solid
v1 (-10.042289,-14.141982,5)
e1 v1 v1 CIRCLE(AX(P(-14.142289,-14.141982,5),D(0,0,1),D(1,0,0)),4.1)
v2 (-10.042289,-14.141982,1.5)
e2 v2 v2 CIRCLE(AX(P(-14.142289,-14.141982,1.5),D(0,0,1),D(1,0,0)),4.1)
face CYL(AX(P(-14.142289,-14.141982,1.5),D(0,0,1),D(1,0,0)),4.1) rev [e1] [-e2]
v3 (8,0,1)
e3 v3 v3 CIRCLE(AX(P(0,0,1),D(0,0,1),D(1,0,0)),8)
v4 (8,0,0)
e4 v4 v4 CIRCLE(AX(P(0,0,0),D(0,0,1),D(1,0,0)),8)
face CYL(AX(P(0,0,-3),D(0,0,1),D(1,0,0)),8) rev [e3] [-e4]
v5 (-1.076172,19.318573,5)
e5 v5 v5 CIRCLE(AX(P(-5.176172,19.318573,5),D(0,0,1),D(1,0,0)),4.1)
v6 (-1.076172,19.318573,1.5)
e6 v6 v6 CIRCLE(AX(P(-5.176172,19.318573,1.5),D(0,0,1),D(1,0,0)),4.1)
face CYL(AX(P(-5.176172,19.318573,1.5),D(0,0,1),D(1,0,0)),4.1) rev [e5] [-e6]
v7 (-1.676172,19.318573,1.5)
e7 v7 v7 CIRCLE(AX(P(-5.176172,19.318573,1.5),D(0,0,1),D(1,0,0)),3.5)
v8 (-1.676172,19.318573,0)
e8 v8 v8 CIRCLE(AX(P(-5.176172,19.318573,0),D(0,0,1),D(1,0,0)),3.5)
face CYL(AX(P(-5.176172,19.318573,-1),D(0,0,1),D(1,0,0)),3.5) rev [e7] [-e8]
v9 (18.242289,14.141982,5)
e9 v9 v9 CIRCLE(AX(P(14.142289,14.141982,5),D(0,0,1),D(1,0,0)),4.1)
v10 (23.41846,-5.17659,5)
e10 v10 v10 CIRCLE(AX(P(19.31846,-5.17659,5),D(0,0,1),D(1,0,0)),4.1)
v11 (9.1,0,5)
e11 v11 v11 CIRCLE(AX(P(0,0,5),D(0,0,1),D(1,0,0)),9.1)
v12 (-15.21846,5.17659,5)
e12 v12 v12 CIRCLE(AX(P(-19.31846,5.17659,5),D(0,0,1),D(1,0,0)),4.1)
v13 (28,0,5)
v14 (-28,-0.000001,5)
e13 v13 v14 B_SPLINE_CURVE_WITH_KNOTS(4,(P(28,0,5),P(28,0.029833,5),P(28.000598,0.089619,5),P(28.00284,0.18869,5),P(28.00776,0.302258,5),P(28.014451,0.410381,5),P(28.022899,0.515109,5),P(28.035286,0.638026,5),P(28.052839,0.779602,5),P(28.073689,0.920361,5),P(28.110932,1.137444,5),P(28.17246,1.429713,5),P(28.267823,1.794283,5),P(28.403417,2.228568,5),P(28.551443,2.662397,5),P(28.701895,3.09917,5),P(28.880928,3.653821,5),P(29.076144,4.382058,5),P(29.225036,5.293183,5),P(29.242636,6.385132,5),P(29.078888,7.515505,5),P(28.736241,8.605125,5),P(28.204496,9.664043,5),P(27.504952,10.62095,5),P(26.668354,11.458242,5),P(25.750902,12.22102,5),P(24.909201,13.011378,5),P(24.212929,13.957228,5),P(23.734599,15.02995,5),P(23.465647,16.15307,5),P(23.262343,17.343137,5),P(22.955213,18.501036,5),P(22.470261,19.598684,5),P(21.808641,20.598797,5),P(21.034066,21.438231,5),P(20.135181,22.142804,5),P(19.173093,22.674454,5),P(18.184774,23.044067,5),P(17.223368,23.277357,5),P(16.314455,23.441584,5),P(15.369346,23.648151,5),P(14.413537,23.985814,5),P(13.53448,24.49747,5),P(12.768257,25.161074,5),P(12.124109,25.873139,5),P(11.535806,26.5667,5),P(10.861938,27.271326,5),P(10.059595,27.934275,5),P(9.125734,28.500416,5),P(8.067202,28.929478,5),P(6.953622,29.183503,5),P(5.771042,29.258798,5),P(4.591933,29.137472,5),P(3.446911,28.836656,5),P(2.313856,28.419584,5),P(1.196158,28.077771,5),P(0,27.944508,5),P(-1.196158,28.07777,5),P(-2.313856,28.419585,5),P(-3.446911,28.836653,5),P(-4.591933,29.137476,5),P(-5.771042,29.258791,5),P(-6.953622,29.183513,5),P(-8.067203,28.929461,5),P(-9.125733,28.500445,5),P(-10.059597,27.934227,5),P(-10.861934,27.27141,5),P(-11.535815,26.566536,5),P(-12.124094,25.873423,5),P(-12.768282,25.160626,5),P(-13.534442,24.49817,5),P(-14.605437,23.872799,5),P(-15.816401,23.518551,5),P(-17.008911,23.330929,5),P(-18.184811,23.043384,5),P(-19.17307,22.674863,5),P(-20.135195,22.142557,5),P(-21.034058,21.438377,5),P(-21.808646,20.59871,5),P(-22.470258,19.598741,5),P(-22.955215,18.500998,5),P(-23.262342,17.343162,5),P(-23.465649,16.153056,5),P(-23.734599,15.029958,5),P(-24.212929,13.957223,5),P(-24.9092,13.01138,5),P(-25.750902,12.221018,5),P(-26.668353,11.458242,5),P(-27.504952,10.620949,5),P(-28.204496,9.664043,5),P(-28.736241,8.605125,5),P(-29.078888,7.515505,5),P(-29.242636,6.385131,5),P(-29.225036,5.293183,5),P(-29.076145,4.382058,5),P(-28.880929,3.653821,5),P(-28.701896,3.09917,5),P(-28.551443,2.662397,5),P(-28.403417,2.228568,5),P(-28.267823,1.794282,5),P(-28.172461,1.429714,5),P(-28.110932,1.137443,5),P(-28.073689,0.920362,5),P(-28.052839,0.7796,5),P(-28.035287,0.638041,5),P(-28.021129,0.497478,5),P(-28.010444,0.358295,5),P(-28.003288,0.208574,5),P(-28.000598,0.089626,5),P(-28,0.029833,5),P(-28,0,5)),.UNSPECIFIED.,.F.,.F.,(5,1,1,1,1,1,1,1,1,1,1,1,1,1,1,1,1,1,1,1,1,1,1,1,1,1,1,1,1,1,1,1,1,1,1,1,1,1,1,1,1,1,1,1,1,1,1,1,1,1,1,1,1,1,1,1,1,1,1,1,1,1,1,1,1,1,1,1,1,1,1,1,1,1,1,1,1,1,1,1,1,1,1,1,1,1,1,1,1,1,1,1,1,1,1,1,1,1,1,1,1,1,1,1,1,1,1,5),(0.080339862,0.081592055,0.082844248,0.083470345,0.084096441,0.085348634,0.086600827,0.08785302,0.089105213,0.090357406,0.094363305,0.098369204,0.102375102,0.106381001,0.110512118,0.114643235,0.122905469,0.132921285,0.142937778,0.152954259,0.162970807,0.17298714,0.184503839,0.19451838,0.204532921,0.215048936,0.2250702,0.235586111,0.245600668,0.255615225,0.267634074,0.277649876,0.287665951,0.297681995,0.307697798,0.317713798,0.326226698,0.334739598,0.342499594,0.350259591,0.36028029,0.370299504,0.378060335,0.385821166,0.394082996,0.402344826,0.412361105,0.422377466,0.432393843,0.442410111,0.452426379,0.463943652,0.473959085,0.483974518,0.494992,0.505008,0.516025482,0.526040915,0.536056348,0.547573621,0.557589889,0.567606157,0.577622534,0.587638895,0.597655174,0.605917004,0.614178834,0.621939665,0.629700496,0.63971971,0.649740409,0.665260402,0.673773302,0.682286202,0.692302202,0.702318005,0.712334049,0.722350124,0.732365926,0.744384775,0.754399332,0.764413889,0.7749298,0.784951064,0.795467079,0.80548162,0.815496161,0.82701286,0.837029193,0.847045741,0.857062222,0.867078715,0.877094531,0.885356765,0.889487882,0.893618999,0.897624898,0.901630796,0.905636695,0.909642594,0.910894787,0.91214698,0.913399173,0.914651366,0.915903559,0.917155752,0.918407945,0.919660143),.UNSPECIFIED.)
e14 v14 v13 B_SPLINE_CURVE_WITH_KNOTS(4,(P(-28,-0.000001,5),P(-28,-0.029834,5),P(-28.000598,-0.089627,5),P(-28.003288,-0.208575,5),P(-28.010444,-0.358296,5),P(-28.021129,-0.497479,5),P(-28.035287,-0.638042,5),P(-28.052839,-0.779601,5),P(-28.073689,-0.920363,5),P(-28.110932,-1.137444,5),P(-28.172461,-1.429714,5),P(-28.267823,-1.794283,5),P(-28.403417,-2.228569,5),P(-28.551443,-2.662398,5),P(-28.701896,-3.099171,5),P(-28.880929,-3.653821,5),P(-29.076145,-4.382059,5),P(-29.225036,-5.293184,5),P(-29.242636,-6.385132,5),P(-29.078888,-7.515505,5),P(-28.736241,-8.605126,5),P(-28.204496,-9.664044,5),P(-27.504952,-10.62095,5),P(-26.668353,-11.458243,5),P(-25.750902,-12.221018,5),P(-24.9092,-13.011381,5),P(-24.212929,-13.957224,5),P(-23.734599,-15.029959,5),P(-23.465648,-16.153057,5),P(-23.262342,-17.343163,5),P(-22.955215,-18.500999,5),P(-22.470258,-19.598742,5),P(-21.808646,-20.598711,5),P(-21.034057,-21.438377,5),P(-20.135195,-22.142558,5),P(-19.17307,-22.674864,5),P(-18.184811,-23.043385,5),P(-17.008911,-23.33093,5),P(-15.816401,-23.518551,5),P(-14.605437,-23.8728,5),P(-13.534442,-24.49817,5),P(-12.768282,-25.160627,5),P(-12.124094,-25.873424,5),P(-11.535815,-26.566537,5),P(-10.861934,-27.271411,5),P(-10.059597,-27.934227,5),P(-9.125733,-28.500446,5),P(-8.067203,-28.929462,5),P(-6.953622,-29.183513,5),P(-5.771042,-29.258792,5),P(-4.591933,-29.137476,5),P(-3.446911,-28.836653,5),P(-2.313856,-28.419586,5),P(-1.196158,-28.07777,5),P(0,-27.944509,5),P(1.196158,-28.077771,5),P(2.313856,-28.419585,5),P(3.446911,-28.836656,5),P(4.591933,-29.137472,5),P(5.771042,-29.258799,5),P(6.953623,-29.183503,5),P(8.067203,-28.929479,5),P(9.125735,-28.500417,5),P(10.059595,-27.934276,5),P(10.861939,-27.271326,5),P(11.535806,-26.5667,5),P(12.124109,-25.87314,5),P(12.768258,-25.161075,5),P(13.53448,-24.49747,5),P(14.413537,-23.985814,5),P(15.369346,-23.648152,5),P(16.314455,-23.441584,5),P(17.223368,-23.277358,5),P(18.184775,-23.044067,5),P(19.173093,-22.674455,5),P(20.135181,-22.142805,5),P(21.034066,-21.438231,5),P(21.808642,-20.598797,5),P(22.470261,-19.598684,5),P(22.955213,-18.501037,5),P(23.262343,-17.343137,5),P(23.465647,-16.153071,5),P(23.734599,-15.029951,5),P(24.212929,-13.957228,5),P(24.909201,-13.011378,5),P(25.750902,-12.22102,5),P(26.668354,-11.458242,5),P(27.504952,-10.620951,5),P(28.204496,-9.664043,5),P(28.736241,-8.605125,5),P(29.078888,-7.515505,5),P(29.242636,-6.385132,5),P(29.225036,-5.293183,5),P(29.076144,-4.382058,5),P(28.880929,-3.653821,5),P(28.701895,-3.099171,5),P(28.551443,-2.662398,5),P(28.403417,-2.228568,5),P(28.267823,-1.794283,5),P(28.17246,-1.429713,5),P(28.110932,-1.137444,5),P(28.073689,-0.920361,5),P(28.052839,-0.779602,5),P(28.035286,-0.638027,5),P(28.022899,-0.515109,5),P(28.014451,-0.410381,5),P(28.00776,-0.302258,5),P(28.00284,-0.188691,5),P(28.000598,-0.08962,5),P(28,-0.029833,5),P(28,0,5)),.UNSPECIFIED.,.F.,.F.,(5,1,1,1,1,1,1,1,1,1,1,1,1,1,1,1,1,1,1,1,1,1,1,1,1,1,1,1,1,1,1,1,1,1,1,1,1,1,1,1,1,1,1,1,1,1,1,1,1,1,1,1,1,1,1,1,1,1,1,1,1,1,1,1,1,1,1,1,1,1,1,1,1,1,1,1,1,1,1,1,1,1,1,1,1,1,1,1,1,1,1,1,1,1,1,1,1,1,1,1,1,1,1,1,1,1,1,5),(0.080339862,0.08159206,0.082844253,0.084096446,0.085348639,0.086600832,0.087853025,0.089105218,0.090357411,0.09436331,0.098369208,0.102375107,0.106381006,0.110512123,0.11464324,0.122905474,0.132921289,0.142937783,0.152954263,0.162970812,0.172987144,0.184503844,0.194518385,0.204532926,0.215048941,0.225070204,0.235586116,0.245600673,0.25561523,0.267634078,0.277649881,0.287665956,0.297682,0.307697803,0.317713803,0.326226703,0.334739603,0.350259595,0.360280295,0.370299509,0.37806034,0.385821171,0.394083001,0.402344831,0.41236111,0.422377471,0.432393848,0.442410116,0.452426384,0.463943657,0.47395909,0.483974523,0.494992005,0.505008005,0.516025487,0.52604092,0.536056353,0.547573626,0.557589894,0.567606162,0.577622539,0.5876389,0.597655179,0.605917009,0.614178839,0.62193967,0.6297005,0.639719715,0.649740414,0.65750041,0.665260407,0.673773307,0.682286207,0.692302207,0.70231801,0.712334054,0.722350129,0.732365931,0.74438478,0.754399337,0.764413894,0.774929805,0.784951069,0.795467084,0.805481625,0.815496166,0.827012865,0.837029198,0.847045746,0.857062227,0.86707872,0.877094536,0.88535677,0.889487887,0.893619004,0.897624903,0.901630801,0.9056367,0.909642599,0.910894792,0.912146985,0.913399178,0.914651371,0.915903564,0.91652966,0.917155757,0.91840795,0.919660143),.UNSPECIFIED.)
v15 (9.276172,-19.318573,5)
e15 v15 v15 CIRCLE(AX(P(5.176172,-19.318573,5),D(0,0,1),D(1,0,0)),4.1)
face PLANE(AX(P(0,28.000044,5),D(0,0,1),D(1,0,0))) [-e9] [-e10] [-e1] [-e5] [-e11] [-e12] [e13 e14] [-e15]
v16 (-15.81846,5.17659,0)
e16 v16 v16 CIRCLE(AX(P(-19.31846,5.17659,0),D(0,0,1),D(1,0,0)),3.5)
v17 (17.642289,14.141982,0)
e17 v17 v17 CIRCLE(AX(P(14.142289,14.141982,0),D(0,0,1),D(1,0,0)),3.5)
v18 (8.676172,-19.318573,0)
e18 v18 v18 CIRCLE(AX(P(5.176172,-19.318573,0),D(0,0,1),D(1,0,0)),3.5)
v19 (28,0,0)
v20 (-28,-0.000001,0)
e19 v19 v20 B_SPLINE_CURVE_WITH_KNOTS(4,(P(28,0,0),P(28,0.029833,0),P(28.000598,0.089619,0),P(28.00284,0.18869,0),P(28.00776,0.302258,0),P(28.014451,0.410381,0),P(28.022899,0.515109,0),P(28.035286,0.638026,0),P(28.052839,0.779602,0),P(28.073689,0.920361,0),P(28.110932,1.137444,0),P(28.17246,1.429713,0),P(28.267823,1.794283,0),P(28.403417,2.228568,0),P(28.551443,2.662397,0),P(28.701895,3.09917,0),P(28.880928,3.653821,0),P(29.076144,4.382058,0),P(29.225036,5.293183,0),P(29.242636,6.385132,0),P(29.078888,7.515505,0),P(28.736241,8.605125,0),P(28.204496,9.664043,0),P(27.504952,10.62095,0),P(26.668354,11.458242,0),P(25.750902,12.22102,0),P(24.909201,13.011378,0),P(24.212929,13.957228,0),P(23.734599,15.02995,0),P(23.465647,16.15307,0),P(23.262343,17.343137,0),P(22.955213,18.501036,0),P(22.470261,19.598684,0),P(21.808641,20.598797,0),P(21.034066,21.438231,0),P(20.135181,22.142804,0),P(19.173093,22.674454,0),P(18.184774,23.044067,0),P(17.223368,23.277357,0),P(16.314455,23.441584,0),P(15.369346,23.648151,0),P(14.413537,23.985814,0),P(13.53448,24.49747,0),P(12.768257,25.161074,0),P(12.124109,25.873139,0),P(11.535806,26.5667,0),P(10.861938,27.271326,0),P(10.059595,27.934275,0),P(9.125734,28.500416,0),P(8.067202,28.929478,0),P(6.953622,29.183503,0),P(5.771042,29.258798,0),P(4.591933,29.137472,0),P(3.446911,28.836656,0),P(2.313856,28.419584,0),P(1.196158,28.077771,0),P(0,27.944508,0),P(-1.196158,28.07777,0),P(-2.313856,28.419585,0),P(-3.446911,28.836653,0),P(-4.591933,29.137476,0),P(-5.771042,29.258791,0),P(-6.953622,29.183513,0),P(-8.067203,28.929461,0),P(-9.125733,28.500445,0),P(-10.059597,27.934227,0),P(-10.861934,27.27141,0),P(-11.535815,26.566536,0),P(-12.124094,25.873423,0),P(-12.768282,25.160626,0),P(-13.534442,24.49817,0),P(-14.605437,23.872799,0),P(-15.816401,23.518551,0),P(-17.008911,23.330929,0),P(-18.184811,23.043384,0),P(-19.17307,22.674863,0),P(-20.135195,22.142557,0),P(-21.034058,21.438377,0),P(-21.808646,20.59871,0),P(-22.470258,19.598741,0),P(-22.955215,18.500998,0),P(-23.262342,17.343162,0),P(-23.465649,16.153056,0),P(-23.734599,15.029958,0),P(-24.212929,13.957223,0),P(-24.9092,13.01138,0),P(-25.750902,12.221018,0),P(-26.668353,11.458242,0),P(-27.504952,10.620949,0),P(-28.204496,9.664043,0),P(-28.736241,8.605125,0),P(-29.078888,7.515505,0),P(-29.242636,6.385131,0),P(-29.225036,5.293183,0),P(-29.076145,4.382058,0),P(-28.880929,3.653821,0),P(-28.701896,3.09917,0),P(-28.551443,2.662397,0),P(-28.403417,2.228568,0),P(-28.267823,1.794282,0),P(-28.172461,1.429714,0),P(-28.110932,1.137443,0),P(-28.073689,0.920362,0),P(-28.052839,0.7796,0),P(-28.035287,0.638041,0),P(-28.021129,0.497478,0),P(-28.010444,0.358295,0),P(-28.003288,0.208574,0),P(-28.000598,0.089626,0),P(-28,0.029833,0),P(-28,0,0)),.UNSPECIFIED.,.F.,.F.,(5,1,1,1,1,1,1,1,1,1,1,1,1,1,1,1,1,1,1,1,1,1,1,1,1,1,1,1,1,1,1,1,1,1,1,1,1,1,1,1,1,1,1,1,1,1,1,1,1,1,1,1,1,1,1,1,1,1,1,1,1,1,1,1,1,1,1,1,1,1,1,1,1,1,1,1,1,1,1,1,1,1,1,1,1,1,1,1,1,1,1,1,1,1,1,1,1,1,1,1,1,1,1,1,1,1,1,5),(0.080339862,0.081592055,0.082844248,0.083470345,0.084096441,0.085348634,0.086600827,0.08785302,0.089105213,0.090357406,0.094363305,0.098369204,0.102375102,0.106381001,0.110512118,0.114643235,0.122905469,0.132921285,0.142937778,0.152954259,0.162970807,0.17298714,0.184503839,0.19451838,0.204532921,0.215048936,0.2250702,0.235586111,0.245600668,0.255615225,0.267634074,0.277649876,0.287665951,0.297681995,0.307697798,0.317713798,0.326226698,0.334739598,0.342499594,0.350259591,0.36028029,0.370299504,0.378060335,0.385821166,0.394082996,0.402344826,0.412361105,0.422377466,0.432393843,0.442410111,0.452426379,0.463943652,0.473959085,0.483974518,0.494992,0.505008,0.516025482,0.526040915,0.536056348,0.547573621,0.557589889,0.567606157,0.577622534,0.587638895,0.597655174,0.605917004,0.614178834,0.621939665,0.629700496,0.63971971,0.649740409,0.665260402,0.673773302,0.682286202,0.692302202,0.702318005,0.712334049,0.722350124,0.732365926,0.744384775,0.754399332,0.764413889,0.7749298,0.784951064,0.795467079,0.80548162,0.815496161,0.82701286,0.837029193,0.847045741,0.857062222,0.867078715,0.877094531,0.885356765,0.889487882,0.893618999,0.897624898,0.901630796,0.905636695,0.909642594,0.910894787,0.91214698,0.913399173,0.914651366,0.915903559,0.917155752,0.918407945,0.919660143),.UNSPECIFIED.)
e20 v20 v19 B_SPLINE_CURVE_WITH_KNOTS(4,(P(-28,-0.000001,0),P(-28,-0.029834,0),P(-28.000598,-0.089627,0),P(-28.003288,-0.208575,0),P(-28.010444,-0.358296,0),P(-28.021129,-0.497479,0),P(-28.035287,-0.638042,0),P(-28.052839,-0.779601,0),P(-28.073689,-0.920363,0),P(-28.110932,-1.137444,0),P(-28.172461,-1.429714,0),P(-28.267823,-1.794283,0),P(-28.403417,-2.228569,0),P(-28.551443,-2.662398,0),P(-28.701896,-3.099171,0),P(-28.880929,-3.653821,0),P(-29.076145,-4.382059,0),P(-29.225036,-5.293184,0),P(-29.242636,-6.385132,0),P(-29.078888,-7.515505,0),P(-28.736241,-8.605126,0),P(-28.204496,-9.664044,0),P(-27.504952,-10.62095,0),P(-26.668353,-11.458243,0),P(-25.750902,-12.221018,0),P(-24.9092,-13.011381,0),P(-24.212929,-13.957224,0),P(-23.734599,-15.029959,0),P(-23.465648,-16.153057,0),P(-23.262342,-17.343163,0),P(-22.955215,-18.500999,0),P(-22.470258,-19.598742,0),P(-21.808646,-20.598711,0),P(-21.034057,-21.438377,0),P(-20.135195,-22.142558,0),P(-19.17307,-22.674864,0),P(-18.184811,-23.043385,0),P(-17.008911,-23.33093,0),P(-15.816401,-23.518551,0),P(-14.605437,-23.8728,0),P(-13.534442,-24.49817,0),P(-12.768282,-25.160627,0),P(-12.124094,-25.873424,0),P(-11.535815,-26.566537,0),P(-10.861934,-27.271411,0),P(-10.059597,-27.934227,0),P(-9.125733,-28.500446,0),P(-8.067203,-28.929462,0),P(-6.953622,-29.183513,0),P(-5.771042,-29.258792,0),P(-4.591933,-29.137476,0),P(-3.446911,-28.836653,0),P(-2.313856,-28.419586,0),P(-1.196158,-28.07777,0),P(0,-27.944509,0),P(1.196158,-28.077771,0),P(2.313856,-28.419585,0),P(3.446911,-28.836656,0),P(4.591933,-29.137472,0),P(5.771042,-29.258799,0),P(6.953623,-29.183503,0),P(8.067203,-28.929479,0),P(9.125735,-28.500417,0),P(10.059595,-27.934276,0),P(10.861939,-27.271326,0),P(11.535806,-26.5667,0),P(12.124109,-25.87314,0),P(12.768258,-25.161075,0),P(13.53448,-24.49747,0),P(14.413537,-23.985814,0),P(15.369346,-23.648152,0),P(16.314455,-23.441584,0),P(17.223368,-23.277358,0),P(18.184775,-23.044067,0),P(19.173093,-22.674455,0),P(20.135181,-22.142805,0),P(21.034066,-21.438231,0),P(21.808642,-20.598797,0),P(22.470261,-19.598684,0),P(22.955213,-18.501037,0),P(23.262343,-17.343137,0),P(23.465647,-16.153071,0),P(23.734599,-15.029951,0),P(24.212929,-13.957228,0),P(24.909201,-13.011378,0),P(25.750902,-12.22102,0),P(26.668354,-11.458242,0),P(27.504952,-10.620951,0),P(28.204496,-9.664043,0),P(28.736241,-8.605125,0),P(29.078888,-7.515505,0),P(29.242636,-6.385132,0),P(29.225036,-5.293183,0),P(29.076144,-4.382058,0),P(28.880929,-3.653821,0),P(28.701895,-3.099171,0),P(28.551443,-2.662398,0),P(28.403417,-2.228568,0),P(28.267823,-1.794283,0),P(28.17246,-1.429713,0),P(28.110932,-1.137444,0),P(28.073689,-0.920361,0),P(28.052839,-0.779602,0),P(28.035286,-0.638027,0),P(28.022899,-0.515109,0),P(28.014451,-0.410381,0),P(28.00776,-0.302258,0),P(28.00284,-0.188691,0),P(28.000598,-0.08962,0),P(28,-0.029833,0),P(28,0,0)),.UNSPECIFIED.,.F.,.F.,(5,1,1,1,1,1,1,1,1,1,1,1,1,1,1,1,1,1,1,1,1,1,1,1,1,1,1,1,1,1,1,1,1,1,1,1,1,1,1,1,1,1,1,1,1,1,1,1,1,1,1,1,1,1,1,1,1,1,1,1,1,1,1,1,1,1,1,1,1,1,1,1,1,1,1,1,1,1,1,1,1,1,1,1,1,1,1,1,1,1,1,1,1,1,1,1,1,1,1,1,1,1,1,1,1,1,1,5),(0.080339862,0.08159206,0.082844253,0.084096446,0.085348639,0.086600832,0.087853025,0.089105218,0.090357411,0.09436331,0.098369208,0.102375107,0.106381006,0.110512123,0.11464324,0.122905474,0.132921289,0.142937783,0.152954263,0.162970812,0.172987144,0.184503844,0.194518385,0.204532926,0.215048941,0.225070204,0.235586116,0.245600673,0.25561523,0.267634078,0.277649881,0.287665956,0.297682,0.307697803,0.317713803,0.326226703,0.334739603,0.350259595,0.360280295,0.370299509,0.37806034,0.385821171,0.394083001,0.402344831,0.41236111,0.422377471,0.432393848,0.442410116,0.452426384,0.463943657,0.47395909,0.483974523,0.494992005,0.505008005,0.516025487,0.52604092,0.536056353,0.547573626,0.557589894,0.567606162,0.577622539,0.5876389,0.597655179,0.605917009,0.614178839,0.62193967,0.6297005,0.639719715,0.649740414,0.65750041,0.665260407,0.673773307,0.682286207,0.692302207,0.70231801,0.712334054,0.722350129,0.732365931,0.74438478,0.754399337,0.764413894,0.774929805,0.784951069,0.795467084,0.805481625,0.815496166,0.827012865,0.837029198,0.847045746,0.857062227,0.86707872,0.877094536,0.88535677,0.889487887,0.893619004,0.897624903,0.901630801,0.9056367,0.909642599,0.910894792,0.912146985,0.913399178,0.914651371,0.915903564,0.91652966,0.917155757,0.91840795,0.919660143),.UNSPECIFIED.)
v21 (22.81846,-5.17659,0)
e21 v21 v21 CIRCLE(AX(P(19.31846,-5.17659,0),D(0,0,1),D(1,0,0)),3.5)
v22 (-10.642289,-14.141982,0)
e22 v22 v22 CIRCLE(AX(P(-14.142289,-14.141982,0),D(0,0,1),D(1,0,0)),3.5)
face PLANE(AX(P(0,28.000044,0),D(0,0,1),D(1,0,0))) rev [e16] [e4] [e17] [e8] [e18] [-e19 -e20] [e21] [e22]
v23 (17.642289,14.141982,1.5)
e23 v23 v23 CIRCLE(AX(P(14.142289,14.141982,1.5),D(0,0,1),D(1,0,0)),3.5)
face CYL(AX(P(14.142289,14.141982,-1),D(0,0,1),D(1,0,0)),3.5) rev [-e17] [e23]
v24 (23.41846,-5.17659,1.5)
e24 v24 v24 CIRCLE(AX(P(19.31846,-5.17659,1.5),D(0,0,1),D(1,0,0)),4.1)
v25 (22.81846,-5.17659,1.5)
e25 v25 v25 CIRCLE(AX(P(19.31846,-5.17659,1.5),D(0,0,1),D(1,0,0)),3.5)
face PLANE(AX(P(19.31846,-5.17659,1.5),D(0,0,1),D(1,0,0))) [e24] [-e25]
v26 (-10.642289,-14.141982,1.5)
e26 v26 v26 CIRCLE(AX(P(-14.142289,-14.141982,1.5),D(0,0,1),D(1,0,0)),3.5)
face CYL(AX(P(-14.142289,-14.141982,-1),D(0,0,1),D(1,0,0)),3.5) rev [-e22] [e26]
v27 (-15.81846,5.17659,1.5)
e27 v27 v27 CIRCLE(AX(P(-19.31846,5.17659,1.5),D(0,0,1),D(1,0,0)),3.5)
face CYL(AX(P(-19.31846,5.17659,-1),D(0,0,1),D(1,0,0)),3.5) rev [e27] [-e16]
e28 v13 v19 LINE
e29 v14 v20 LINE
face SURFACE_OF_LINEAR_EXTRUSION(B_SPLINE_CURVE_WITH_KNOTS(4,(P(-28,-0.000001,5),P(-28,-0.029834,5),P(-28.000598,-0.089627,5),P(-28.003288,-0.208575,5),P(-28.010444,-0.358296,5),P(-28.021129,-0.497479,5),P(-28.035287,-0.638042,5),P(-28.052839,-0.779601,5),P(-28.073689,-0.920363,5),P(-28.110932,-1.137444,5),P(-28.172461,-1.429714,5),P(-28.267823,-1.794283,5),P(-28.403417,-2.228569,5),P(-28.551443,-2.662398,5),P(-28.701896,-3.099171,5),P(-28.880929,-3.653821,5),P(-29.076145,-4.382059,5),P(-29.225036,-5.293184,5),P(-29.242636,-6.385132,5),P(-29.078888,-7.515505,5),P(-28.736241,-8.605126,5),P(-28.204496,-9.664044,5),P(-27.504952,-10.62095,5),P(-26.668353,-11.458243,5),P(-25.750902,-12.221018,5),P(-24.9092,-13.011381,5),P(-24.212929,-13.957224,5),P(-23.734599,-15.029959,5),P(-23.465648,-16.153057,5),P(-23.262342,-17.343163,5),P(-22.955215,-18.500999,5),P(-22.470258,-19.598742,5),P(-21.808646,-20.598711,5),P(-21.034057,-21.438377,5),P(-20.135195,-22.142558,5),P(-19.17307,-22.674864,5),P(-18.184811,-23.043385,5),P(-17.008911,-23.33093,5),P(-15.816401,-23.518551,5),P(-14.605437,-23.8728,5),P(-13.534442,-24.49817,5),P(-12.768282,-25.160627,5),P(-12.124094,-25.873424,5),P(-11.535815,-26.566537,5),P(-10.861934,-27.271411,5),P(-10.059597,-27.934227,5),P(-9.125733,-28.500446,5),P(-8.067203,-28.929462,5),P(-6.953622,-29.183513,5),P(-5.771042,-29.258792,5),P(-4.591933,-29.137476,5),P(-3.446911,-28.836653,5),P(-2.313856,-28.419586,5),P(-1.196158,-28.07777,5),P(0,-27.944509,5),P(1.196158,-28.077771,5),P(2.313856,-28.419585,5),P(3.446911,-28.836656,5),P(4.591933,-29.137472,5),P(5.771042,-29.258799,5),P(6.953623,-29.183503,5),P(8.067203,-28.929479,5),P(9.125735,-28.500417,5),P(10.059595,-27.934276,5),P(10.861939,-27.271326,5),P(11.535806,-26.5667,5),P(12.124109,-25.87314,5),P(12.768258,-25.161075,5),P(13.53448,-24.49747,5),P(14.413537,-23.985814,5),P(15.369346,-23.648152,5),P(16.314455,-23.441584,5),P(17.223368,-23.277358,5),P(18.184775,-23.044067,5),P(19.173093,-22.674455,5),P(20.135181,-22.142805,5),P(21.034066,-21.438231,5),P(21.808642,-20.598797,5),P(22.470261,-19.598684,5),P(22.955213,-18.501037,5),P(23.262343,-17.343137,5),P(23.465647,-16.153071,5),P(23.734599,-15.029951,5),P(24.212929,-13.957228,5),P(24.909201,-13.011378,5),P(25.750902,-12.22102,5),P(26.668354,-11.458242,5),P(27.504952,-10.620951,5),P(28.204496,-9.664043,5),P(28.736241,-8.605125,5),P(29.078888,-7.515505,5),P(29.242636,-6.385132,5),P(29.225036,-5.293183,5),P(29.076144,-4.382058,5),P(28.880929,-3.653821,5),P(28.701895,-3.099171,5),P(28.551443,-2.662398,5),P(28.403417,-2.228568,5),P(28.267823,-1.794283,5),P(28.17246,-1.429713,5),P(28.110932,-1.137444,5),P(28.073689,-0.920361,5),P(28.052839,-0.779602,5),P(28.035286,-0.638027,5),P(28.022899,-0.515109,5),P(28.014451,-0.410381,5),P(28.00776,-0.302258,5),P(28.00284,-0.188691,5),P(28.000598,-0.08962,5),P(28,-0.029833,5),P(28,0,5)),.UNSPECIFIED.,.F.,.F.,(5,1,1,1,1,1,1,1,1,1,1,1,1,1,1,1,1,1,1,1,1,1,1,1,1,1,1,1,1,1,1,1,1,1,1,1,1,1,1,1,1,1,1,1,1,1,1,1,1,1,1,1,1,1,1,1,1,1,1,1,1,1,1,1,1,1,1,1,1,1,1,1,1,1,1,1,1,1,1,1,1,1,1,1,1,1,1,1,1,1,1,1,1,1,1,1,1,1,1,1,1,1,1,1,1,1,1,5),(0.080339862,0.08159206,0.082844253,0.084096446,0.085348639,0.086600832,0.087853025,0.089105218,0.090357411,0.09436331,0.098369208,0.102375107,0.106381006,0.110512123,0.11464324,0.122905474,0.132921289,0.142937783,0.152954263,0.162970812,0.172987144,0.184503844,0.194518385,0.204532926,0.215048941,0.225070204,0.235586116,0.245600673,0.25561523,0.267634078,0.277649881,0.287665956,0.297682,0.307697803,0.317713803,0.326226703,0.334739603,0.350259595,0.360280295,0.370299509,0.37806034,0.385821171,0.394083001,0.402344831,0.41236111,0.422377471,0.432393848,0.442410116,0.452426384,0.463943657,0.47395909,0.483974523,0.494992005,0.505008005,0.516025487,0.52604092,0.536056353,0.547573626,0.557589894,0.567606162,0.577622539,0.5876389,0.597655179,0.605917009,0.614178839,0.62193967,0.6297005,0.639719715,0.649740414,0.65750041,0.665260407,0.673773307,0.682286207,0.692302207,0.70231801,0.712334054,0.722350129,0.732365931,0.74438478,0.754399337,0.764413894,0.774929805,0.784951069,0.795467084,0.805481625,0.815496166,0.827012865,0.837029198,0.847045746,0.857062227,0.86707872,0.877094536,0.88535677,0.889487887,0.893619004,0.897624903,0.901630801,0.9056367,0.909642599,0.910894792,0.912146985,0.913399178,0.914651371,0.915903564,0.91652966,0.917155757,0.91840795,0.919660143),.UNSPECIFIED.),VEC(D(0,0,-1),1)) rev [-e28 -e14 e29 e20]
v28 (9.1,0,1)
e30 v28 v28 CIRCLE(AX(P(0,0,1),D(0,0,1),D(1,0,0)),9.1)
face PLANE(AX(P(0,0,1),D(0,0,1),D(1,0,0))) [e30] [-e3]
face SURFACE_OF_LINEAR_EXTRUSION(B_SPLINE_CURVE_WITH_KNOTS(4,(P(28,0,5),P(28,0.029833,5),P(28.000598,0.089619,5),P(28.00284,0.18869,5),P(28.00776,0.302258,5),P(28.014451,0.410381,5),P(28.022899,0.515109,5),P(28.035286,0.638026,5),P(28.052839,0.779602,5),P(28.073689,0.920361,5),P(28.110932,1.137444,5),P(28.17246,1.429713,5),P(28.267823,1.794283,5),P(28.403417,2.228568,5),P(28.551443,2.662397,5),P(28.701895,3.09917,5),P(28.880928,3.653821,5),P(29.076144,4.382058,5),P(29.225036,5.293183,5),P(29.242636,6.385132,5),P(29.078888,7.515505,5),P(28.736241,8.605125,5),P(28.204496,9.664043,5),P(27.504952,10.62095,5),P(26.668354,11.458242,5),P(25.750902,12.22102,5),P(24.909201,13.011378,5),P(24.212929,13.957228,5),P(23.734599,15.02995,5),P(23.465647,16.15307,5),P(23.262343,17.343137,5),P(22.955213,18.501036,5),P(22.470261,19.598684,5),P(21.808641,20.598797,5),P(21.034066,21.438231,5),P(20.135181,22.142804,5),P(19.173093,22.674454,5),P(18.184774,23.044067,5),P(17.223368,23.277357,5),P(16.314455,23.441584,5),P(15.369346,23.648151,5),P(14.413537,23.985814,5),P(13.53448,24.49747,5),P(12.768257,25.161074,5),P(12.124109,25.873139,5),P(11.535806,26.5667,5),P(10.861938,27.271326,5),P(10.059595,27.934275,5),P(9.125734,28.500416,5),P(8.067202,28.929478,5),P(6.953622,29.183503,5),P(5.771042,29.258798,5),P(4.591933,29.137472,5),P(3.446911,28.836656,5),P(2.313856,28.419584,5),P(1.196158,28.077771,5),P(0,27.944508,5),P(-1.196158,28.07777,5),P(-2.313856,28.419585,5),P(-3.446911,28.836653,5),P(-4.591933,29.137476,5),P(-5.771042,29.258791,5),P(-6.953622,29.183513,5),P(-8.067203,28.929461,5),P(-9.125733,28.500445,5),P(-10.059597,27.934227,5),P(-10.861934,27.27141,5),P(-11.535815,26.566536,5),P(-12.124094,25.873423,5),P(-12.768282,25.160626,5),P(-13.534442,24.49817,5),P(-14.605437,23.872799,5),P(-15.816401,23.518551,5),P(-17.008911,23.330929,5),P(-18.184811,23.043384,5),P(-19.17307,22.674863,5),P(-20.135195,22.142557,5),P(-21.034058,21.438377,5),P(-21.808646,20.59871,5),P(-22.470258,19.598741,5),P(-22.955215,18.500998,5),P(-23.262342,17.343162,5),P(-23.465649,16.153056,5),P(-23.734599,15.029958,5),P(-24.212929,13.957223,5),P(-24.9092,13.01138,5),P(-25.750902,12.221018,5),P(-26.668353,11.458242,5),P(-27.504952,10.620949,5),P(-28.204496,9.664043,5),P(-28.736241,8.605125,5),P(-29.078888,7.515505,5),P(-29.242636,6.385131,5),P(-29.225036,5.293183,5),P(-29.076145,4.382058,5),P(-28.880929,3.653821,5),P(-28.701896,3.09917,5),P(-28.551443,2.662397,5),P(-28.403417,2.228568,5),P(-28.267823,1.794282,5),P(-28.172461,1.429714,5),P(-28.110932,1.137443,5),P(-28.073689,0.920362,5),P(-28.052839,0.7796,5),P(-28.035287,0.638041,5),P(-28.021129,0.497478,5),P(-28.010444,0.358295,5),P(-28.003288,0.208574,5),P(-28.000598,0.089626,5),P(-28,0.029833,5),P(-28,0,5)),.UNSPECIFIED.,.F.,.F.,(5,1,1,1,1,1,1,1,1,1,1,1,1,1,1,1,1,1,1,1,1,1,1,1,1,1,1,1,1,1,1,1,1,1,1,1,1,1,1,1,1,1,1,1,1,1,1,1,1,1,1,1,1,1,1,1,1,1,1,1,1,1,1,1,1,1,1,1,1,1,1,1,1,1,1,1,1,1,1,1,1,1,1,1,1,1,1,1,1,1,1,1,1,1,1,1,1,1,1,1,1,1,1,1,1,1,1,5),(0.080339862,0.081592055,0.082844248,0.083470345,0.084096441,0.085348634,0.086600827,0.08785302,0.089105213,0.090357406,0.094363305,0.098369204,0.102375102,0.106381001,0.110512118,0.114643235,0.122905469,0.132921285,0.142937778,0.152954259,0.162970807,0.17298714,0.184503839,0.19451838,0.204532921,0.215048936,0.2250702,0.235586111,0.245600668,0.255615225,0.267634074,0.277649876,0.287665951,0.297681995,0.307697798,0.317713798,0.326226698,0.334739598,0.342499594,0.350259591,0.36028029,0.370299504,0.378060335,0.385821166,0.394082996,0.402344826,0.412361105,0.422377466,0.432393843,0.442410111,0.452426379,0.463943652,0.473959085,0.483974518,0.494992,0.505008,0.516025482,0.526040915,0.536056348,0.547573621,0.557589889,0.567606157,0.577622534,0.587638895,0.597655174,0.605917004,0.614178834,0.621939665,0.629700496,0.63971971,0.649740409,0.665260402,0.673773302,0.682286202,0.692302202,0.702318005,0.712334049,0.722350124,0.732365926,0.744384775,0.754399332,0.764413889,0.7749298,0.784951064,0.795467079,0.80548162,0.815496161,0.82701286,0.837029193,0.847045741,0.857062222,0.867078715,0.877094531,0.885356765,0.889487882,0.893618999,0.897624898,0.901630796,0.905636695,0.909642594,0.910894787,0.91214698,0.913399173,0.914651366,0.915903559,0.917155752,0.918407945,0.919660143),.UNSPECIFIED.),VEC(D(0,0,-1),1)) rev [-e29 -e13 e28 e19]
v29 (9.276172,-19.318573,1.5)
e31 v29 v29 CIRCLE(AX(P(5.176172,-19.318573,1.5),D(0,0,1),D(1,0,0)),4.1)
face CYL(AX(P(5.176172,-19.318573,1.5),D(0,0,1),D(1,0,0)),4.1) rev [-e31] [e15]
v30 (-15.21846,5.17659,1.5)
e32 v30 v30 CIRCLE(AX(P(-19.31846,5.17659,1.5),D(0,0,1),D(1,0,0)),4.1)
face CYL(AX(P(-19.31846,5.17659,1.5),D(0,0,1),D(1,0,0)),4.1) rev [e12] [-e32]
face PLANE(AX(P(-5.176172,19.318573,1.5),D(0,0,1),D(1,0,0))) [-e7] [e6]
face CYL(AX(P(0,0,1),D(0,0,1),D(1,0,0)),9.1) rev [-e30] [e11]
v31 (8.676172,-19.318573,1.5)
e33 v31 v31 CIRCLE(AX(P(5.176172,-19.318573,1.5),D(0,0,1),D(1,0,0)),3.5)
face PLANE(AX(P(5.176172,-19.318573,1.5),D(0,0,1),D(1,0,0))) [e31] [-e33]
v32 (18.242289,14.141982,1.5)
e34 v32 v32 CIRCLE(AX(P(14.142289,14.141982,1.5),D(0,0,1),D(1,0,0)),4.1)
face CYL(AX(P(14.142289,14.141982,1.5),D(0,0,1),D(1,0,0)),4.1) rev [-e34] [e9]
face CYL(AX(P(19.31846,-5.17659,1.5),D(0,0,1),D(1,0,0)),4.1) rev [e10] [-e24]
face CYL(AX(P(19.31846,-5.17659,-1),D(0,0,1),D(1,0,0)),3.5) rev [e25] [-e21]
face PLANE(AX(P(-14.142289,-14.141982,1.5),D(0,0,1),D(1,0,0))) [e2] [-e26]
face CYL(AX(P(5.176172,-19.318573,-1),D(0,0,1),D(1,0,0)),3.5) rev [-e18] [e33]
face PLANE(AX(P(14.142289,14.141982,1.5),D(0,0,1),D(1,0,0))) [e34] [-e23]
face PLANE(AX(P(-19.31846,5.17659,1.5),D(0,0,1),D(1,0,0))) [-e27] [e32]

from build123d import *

# Parameters (mm, degrees)
BOSS_EXTRUDE1_DEPTH = 5
SKETCH5_R           = 9.1
CUT_EXTRUDE1_DEPTH  = 4
SKETCH6_R           = 8
CUT_EXTRUDE2_DEPTH  = 4
SKETCH7_R           = 4.1
CUT_EXTRUDE3_DEPTH  = 3.5
SKETCH8_R           = 3.5
CUT_EXTRUDE4_DEPTH  = 2.5


with BuildPart() as part:
    # Boss-Extrude1: read off the stored shape, not the designer's step
    # Boss-Extrude1 outline → Boss-Extrude1 (new body)
    with BuildSketch(Plane.XY):
        with BuildLine():
            add(Edge.make_bspline(
                [(-28, -6.29e-07), (-28.000000003, -0.02983365), (-28.000597891, -0.089626539), (-28.003288368, -0.208574631), (-28.010443823, -0.358296014), (-28.021129099, -0.497478972), (-28.035286515, -0.638042059), (-28.052838842, -0.779600747), (-28.07368907, -0.920362623), (-28.1109323, -1.137443527), (-28.172460627, -1.429714461), (-28.267823198, -1.79428308), (-28.403417207, -2.228569003), (-28.551443102, -2.662397725), (-28.701895511, -3.099170971), (-28.88092903, -3.653821492), (-29.076144869, -4.382058747), (-29.225035924, -5.293183629), (-29.242636392, -6.385132281), (-29.078888248, -7.515505435), (-28.736240754, -8.605125547), (-28.204495712, -9.664043971), (-27.50495183, -10.62095002), (-26.668353013, -11.458243252), (-25.750901936, -12.221018429), (-24.909200307, -13.01138102), (-24.212928723, -13.957224134), (-23.734598908, -15.029958866), (-23.46564848, -16.15305676), (-23.262341743, -17.343162836), (-22.955215303, -18.500998827), (-22.47025771, -19.598741792), (-21.808646094, -20.598710665), (-21.034057487, -21.438377421), (-20.135194621, -22.142557513), (-19.173070125, -22.674863767), (-18.1848113, -23.043385137), (-17.008911051, -23.330929651), (-15.816401117, -23.518551322), (-14.605437074, -23.872800143), (-13.534441757, -24.498170419), (-12.768281975, -25.16062656), (-12.124093583, -25.873424042), (-11.535815011, -26.566536844), (-10.861933868, -27.271410783), (-10.059597212, -27.93422734), (-9.125732684, -28.500446113), (-8.067203076, -28.929461856), (-6.953621623, -29.18351333), (-5.77104211, -29.258791955), (-4.591932769, -29.137476161), (-3.446910823, -28.836653139), (-2.313856017, -28.419585682), (-1.196157726, -28.077770272), (2.65e-07, -27.944508687), (1.19615809, -28.077771155), (2.313856477, -28.419584766), (3.446911017, -28.836656413), (4.591933415, -29.137472254), (5.771042166, -29.258798734), (6.953622593, -29.18350316), (8.0672025, -28.929478891), (9.125734587, -28.500416534), (10.059594746, -27.934275725), (10.861938581, -27.271326188), (11.535806076, -26.566700048), (12.124109152, -25.873139784), (12.768257554, -25.161074739), (13.534480401, -24.497470193), (14.413536978, -23.985814416), (15.369345941, -23.648151534), (16.314454966, -23.441584325), (17.223368133, -23.277357609), (18.184774521, -23.044067259), (19.173093033, -22.674454737), (20.135181499, -22.142804808), (21.034065799, -21.438231043), (21.808641528, -20.59879691), (22.470260843, -19.598684385), (22.955213046, -18.501036747), (23.262342804, -17.343137392), (23.465647405, -16.153070516), (23.734599269, -15.029950644), (24.21292871, -13.957228341), (24.909200967, -13.011377899), (25.750902477, -12.221020373), (26.668353733, -11.458242002), (27.504952345, -10.620950514), (28.204496137, -9.664043352), (28.736240977, -8.605125426), (29.078888317, -7.515504907), (29.242636266, -6.385131952), (29.225035635, -5.293183156), (29.07614444, -4.382058382), (28.880928524, -3.653821128), (28.701894972, -3.09917056), (28.551442568, -2.6623975), (28.403416705, -2.228568363), (28.26782276, -1.794283178), (28.17246026, -1.429713361), (28.110932001, -1.137443964), (28.073688824, -0.920361255), (28.052838632, -0.779602286), (28.035286341, -0.638026543), (28.022898635, -0.515108879), (28.014450689, -0.410381436), (28.007760445, -0.30225806), (28.002839903, -0.188690642), (28.000597866, -0.089619771), (27.999999995, -0.029833196), (28, -1.75e-07)],
                knots=[0.080339862, 0.080339862, 0.080339862, 0.080339862, 0.080339862, 0.08159206, 0.082844253, 0.084096446, 0.085348639, 0.086600832, 0.087853025, 0.089105218, 0.090357411, 0.09436331, 0.098369208, 0.102375107, 0.106381006, 0.110512123, 0.11464324, 0.122905474, 0.132921289, 0.142937783, 0.152954263, 0.162970812, 0.172987144, 0.184503844, 0.194518385, 0.204532926, 0.215048941, 0.225070204, 0.235586116, 0.245600673, 0.25561523, 0.267634078, 0.277649881, 0.287665956, 0.297682, 0.307697803, 0.317713803, 0.326226703, 0.334739603, 0.350259595, 0.360280295, 0.370299509, 0.37806034, 0.385821171, 0.394083001, 0.402344831, 0.41236111, 0.422377471, 0.432393848, 0.442410116, 0.452426384, 0.463943657, 0.47395909, 0.483974523, 0.494992005, 0.505008005, 0.516025487, 0.52604092, 0.536056353, 0.547573626, 0.557589894, 0.567606162, 0.577622539, 0.5876389, 0.597655179, 0.605917009, 0.614178839, 0.62193967, 0.6297005, 0.639719715, 0.649740414, 0.65750041, 0.665260407, 0.673773307, 0.682286207, 0.692302207, 0.70231801, 0.712334054, 0.722350129, 0.732365931, 0.74438478, 0.754399337, 0.764413894, 0.774929805, 0.784951069, 0.795467084, 0.805481625, 0.815496166, 0.827012865, 0.837029198, 0.847045746, 0.857062227, 0.86707872, 0.877094536, 0.88535677, 0.889487887, 0.893619004, 0.897624903, 0.901630801, 0.9056367, 0.909642599, 0.910894792, 0.912146985, 0.913399178, 0.914651371, 0.915903564, 0.91652966, 0.917155757, 0.91840795, 0.919660143, 0.919660143, 0.919660143, 0.919660143, 0.919660143], degree=4))
            add(Edge.make_bspline(
                [(28, -1.75e-07), (27.999999995, 0.029832846), (28.000597866, 0.08961942), (28.002839901, 0.188690291), (28.007760443, 0.302257709), (28.014450686, 0.410381085), (28.022898631, 0.515108529), (28.035286336, 0.638026193), (28.052838626, 0.779601936), (28.073688816, 0.920360905), (28.110931992, 1.137443615), (28.172460249, 1.429713012), (28.267822745, 1.79428283), (28.403416687, 2.228568016), (28.551442546, 2.662397154), (28.701894947, 3.099170216), (28.880928495, 3.653820785), (29.076144404, 4.38205804), (29.225035592, 5.293182815), (29.242636214, 6.385131612), (29.078888256, 7.515504565), (28.736240908, 8.605125082), (28.204496059, 9.664043003), (27.504952259, 10.62095016), (26.66835364, 11.458241641), (25.750902378, 12.221020005), (24.909200862, 13.011377523), (24.212928597, 13.95722796), (23.734599147, 15.029950259), (23.465647274, 16.153070128), (23.262342664, 17.343137003), (22.955212896, 18.501036355), (22.470260684, 19.59868399), (21.808641361, 20.598796509), (21.034065625, 21.438230636), (20.135181319, 22.142804394), (19.173092849, 22.674454315), (18.184774334, 23.044066829), (17.223367944, 23.277357171), (16.314454776, 23.44158388), (15.36934575, 23.648151081), (14.413536783, 23.985813955), (13.534480202, 24.497469725), (12.76825735, 25.161074265), (12.124108943, 25.873139305), (11.535805861, 26.566699564), (10.86193836, 27.271325699), (10.05959452, 27.934275229), (9.125734356, 28.500416031), (8.067202266, 28.929478379), (6.953622356, 29.183502639), (5.771041929, 29.258798203), (4.591933179, 29.137471714), (3.446910784, 28.836655864), (2.313856247, 28.419584208), (1.196157862, 28.077770587), (3.9e-08, 27.94450811), (-1.196157953, 28.077769684), (-2.313856247, 28.419585086), (-3.446911056, 28.836652534), (-4.591933006, 29.137475546), (-5.771042347, 29.258791331), (-6.953621859, 29.183512697), (-8.06720331, 28.929461213), (-9.125732915, 28.500445461), (-10.059597439, 27.934226681), (-10.861934089, 27.271410118), (-11.535815226, 26.566536173), (-12.124093793, 25.873423366), (-12.768282179, 25.160625879), (-13.534441956, 24.498169732), (-14.605437268, 23.872799447), (-15.816401308, 23.518550616), (-17.00891124, 23.330928936), (-18.184811486, 23.043384412), (-19.173070309, 22.674863034), (-20.135194801, 22.142556773), (-21.03405766, 21.438376673), (-21.808646261, 20.598709911), (-22.470257869, 19.598741032), (-22.955215453, 18.500998064), (-23.262341883, 17.34316207), (-23.465648611, 16.153055992), (-23.734599029, 15.029958097), (-24.212928836, 13.95722336), (-24.909200413, 13.01138024), (-25.750902035, 12.221017643), (-26.668353106, 11.458242458), (-27.504951916, 10.62094922), (-28.204495791, 9.664043165), (-28.736240824, 8.605124737), (-29.078888309, 7.515504621), (-29.242636444, 6.385131467), (-29.225035967, 5.293182814), (-29.076144904, 4.382057933), (-28.88092906, 3.653820681), (-28.701895536, 3.099170161), (-28.551443123, 2.662396917), (-28.403417225, 2.228568195), (-28.267823213, 1.794282274), (-28.172460638, 1.429713655), (-28.110932309, 1.137442722), (-28.073689077, 0.920361818), (-28.052838848, 0.779599942), (-28.03528652, 0.638041254), (-28.021129103, 0.497478168), (-28.010443826, 0.358295209), (-28.003288369, 0.208573826), (-28.000597891, 0.089625735), (-28.000000004, 0.029832846), (-28, -6.29e-07)],
                knots=[0.080339862, 0.080339862, 0.080339862, 0.080339862, 0.080339862, 0.081592055, 0.082844248, 0.083470345, 0.084096441, 0.085348634, 0.086600827, 0.08785302, 0.089105213, 0.090357406, 0.094363305, 0.098369204, 0.102375102, 0.106381001, 0.110512118, 0.114643235, 0.122905469, 0.132921285, 0.142937778, 0.152954259, 0.162970807, 0.17298714, 0.184503839, 0.19451838, 0.204532921, 0.215048936, 0.2250702, 0.235586111, 0.245600668, 0.255615225, 0.267634074, 0.277649876, 0.287665951, 0.297681995, 0.307697798, 0.317713798, 0.326226698, 0.334739598, 0.342499594, 0.350259591, 0.36028029, 0.370299504, 0.378060335, 0.385821166, 0.394082996, 0.402344826, 0.412361105, 0.422377466, 0.432393843, 0.442410111, 0.452426379, 0.463943652, 0.473959085, 0.483974518, 0.494992, 0.505008, 0.516025482, 0.526040915, 0.536056348, 0.547573621, 0.557589889, 0.567606157, 0.577622534, 0.587638895, 0.597655174, 0.605917004, 0.614178834, 0.621939665, 0.629700496, 0.63971971, 0.649740409, 0.665260402, 0.673773302, 0.682286202, 0.692302202, 0.702318005, 0.712334049, 0.722350124, 0.732365926, 0.744384775, 0.754399332, 0.764413889, 0.7749298, 0.784951064, 0.795467079, 0.80548162, 0.815496161, 0.82701286, 0.837029193, 0.847045741, 0.857062222, 0.867078715, 0.877094531, 0.885356765, 0.889487882, 0.893618999, 0.897624898, 0.901630796, 0.905636695, 0.909642594, 0.910894787, 0.91214698, 0.913399173, 0.914651366, 0.915903559, 0.917155752, 0.918407945, 0.919660143, 0.919660143, 0.919660143, 0.919660143, 0.919660143], degree=4))
        make_face()
    extrude(amount=BOSS_EXTRUDE1_DEPTH)

    # Sketch5 → Cut-Extrude1 (cut)
    with BuildSketch(Plane.XY.offset(5)):
        Circle(SKETCH5_R)
    extrude(amount=-CUT_EXTRUDE1_DEPTH, mode=Mode.SUBTRACT)

    # Sketch6 → Cut-Extrude2 (cut)
    with BuildSketch(Plane.XY.offset(1)):
        Circle(SKETCH6_R)
    extrude(amount=-CUT_EXTRUDE2_DEPTH, mode=Mode.SUBTRACT)

    # Sketch7 → Cut-Extrude3 (cut)
    with BuildSketch(Plane.XY.offset(5)):
        with Locations((-14.142288837, -14.141982409)):
            Circle(SKETCH7_R)
        with Locations((-19.318460445, 5.176590196)):
            Circle(SKETCH7_R)
        with Locations((-5.176171608, 19.318572605)):
            Circle(SKETCH7_R)
        with Locations((14.142288837, 14.141982409)):
            Circle(SKETCH7_R)
        with Locations((19.318460445, -5.176590196)):
            Circle(SKETCH7_R)
        with Locations((5.176171608, -19.318572605)):
            Circle(SKETCH7_R)
    extrude(amount=-CUT_EXTRUDE3_DEPTH, mode=Mode.SUBTRACT)

    # Sketch8 → Cut-Extrude4 (cut)
    with BuildSketch(Plane.XY.offset(1.5)):
        with Locations((-14.142288837, -14.141982409)):
            Circle(SKETCH8_R)
        with Locations((-19.318460445, 5.176590196)):
            Circle(SKETCH8_R)
        with Locations((-5.176171608, 19.318572605)):
            Circle(SKETCH8_R)
        with Locations((14.142288837, 14.141982409)):
            Circle(SKETCH8_R)
        with Locations((19.318460445, -5.176590196)):
            Circle(SKETCH8_R)
        with Locations((5.176171608, -19.318572605)):
            Circle(SKETCH8_R)
    extrude(amount=-CUT_EXTRUDE4_DEPTH, mode=Mode.SUBTRACT)


solid = part.part
